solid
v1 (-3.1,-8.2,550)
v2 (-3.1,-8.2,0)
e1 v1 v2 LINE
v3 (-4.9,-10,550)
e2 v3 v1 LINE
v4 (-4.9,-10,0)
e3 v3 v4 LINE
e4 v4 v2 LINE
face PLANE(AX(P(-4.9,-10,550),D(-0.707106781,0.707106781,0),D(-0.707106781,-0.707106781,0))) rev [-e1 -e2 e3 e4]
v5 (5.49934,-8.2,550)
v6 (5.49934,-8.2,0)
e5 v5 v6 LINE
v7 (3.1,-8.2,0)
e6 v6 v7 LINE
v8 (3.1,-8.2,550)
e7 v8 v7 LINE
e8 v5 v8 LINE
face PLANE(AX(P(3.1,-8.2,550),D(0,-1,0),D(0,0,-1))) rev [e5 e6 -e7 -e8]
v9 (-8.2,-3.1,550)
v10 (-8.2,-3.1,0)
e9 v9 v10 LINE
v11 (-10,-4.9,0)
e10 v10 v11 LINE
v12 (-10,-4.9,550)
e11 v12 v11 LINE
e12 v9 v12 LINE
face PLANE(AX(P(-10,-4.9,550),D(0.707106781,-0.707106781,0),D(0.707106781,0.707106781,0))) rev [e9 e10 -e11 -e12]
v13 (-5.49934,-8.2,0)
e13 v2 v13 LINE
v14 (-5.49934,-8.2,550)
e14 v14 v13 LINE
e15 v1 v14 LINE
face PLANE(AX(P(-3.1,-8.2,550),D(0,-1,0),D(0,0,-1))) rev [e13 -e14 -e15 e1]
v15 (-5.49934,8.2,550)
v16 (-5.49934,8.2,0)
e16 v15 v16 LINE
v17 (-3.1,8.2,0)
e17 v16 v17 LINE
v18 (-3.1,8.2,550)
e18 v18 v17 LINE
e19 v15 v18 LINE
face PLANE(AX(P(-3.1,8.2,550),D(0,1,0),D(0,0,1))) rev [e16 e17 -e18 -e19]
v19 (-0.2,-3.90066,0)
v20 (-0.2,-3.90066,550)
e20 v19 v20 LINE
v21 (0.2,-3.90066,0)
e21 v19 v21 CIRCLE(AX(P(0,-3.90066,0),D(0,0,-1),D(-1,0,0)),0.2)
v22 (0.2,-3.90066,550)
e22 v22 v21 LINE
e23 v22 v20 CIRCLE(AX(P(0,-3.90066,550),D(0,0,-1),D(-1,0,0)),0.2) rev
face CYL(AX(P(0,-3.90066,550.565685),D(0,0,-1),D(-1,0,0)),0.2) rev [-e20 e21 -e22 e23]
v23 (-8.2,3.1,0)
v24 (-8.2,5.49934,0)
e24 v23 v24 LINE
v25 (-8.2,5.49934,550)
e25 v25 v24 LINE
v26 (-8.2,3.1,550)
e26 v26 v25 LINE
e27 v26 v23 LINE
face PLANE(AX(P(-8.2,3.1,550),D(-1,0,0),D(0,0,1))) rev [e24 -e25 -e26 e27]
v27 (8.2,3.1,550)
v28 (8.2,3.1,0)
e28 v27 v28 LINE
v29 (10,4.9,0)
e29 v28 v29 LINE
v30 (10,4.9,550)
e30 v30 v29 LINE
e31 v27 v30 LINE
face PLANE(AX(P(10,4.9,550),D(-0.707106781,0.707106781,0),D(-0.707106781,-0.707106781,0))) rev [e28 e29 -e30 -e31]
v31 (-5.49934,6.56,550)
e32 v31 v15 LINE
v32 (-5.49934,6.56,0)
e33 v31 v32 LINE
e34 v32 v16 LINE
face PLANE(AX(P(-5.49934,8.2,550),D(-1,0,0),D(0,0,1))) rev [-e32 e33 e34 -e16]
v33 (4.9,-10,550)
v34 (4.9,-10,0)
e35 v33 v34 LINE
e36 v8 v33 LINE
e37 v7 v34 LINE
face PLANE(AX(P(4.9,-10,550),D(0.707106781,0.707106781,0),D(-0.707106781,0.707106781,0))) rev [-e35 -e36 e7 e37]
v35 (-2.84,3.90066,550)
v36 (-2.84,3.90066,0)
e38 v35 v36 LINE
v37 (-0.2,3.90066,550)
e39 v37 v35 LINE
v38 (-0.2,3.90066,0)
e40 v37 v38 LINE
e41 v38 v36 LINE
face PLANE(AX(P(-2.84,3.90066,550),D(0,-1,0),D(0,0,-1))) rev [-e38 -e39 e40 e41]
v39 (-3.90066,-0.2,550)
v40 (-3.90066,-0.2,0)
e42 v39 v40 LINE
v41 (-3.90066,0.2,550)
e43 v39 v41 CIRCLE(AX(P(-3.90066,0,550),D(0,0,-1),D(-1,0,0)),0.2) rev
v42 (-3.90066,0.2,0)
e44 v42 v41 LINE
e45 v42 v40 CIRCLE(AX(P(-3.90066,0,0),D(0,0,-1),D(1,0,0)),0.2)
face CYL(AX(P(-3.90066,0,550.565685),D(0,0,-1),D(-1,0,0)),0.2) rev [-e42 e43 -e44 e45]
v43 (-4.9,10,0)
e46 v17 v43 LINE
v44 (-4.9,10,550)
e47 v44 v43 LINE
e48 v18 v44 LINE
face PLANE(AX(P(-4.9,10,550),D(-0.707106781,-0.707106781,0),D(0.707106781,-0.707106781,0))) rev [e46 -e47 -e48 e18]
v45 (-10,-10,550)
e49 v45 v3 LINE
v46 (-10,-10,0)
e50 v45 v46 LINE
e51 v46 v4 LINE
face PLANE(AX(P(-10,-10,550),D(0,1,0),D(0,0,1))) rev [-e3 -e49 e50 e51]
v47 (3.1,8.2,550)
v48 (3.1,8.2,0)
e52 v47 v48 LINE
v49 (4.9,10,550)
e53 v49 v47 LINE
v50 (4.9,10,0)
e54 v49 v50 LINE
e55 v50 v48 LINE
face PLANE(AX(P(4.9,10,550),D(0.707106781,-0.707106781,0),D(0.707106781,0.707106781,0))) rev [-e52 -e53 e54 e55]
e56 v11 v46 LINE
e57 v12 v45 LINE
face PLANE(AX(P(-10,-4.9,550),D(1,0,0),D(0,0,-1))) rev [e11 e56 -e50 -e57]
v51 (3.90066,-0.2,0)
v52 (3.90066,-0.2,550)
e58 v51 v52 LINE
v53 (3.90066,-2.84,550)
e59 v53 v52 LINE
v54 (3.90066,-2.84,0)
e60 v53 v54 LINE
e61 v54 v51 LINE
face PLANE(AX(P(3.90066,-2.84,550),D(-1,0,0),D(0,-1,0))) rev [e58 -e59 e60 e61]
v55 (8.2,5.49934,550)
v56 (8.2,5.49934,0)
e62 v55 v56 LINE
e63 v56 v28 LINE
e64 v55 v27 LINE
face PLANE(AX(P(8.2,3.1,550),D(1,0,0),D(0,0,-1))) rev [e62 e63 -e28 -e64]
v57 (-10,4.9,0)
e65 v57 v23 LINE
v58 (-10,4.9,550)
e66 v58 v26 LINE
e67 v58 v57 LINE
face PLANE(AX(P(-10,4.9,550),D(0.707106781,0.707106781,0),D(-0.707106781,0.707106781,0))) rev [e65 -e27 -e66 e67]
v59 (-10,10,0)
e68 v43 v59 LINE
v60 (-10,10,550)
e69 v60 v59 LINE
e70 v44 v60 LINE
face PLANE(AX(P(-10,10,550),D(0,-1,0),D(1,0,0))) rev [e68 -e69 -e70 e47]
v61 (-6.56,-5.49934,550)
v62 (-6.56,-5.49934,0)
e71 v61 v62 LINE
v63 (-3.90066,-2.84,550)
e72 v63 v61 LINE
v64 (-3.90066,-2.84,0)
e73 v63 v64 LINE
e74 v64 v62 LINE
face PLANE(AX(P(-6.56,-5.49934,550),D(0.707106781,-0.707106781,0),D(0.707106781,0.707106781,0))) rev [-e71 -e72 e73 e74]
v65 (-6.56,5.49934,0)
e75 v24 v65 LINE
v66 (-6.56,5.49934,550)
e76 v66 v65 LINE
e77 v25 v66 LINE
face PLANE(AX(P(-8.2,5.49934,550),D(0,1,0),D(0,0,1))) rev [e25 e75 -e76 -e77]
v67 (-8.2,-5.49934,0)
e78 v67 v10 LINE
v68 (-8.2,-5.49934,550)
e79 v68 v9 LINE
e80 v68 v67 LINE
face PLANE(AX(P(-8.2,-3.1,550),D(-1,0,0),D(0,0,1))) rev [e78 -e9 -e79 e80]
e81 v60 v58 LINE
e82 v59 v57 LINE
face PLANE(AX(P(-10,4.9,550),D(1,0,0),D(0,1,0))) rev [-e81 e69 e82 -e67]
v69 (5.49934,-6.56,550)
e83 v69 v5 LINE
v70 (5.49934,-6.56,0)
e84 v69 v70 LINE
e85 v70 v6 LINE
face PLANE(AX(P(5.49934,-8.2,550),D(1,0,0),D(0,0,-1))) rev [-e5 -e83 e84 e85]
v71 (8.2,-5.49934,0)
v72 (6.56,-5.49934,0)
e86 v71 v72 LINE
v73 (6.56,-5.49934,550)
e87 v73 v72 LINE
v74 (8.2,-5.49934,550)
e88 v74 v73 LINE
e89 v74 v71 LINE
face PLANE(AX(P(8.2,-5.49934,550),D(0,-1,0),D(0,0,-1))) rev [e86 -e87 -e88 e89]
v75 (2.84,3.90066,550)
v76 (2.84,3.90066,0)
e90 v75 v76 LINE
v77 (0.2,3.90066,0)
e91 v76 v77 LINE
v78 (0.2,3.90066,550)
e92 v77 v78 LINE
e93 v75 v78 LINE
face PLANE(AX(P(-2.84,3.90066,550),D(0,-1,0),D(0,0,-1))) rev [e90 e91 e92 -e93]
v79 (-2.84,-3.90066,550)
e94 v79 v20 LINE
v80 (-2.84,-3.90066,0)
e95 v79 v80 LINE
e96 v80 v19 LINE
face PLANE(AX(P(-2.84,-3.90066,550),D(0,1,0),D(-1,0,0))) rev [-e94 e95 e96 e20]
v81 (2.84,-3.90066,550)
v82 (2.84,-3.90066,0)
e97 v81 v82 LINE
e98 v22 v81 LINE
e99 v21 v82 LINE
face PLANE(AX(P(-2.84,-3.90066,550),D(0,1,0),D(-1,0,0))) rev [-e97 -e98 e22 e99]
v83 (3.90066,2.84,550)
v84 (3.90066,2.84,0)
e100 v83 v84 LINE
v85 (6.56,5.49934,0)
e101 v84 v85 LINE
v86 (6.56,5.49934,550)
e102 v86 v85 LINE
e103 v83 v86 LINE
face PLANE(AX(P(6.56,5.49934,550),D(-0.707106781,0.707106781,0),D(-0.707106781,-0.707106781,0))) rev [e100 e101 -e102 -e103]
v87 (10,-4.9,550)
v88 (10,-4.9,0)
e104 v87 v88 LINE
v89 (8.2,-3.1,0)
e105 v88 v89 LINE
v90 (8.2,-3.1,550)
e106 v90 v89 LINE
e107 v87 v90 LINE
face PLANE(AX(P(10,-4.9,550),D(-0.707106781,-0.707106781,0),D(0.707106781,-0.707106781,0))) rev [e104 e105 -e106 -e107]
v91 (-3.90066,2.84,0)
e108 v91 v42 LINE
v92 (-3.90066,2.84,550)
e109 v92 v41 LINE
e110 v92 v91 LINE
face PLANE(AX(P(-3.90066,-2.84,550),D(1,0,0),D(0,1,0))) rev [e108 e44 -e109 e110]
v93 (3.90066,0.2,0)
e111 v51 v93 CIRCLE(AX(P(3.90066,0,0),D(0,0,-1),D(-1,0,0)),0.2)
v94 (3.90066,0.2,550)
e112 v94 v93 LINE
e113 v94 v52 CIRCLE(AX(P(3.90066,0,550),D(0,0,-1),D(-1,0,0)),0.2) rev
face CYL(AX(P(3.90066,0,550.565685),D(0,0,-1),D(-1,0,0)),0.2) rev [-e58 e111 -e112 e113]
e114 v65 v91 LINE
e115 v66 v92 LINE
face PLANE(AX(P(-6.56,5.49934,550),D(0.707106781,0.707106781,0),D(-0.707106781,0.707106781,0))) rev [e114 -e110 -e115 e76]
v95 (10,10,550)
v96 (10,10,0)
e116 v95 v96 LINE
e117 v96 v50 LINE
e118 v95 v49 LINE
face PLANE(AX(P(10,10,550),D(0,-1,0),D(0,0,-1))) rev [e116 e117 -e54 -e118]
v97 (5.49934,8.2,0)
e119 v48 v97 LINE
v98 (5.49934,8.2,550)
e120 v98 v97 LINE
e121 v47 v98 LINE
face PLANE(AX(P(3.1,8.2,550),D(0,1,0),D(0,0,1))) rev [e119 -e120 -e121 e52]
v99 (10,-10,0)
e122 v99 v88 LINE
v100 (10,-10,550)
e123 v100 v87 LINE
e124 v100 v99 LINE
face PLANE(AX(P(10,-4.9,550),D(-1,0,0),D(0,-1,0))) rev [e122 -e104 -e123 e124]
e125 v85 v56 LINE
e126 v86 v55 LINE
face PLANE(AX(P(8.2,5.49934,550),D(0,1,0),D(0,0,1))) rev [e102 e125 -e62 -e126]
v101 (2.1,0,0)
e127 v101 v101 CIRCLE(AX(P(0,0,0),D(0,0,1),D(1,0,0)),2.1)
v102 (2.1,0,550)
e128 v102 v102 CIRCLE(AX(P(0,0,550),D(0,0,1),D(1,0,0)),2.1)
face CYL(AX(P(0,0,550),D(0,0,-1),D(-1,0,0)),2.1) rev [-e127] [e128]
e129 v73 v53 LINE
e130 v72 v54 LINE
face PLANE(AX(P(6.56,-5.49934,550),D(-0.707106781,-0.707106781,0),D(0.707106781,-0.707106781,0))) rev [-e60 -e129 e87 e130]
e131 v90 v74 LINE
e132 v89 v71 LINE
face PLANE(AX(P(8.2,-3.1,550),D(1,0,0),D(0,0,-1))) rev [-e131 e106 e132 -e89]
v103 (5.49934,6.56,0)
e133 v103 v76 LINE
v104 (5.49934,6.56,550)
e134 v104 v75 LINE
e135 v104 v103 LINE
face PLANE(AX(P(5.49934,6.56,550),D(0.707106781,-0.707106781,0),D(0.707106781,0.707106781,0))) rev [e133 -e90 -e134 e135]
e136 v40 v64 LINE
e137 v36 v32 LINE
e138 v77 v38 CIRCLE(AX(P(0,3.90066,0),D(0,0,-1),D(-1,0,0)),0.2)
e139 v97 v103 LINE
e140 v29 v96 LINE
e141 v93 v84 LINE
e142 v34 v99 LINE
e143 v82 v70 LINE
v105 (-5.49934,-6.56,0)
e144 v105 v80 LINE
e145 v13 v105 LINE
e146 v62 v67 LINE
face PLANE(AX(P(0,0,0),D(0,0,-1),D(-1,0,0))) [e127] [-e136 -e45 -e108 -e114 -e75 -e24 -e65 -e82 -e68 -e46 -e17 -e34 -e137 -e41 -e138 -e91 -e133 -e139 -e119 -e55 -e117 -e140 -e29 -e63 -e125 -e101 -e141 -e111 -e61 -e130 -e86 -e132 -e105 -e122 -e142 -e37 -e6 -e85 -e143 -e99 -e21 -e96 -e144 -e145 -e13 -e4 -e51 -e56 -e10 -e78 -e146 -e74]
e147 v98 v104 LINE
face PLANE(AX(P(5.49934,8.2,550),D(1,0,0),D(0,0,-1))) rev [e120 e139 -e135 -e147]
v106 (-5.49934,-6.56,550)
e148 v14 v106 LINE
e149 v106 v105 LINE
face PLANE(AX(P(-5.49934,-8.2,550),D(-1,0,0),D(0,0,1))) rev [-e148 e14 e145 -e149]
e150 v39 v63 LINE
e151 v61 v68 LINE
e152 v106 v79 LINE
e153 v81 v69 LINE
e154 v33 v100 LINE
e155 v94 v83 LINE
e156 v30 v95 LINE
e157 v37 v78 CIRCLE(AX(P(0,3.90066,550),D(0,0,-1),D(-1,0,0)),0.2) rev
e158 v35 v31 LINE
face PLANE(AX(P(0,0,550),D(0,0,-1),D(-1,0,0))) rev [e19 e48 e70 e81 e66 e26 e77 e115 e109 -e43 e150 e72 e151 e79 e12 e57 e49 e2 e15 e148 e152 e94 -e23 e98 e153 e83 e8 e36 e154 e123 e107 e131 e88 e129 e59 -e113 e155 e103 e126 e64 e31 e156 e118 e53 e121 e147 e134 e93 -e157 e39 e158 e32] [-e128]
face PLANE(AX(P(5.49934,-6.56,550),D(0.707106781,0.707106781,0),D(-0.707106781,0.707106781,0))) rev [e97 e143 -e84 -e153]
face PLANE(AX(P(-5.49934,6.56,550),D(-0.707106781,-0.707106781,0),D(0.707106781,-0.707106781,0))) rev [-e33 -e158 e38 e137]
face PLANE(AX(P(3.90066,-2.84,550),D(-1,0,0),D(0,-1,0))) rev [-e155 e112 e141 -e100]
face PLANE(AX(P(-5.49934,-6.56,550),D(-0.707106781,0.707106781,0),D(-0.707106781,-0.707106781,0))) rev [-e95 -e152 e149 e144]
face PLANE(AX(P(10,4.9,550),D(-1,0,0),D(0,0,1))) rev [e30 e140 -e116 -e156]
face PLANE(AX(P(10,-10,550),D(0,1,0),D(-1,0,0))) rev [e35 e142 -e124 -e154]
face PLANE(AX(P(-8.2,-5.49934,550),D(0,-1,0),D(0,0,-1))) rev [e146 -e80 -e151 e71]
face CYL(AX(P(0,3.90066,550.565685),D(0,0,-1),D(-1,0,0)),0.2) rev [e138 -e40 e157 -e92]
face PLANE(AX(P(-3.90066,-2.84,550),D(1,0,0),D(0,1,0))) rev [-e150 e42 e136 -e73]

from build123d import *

# Parameters (mm, degrees)
SKETCH1_R           = 2.1
BOSS_EXTRUDE1_DEPTH = 550
CUT_EXTRUDE1_DEPTH  = 550


# Read off the part's stored shape, not the designer's step: Cut-Extrude1
with BuildPart() as part:
    # Sketch1 → Boss-Extrude1 (new body)
    with BuildSketch(Plane.XY):
        Polygon((-10, -4.9), (-10, -10), (-4.9, -10), (-3.1, -8.2), (-5.499339828, -8.2), (-5.499339828, -6.56), (-2.84, -3.900660172), (2.84, -3.900660172), (5.499339828, -6.56), (5.499339828, -8.2), (3.1, -8.2), (4.9, -10), (10, -10), (10, -4.9), (8.2, -3.1), (8.2, -5.499339828), (6.56, -5.499339828), (3.900660172, -2.84), (3.900660172, 2.84), (6.56, 5.499339828), (8.2, 5.499339828), (8.2, 3.1), (10, 4.9), (10, 10), (4.9, 10), (3.1, 8.2), (5.499339828, 8.2), (5.499339828, 6.56), (2.84, 3.900660172), (-2.84, 3.900660172), (-5.499339828, 6.56), (-5.499339828, 8.2), (-3.1, 8.2), (-4.9, 10), (-10, 10), (-10, 4.9), (-8.2, 3.1), (-8.2, 5.499339828), (-6.56, 5.499339828), (-3.900660172, 2.84), (-3.900660172, -2.84), (-6.56, -5.499339828), (-8.2, -5.499339828), (-8.2, -3.1), align=None)
        Circle(SKETCH1_R, mode=Mode.SUBTRACT)
    extrude(amount=BOSS_EXTRUDE1_DEPTH)

    # Cut-Extrude1 outline → Cut-Extrude1 (cut)
    with BuildSketch(Plane.XY):
        with BuildLine():
            ThreePointArc((-3.900660172, -0.2), (-3.700660172, 0), (-3.900660172, 0.2))
            Line((-3.900660172, 0.2), (-3.900660172, -0.2))
        make_face()
        with BuildLine():
            ThreePointArc((-0.2, 3.900660172), (0, 3.700660172), (0.2, 3.900660172))
            Line((0.2, 3.900660172), (-0.2, 3.900660172))
        make_face()
        with BuildLine():
            ThreePointArc((3.900660172, 0.2), (3.700660172, 0), (3.900660172, -0.2))
            Line((3.900660172, -0.2), (3.900660172, 0.2))
        make_face()
        with BuildLine():
            ThreePointArc((0.2, -3.900660172), (0, -3.700660172), (-0.2, -3.900660172))
            Line((-0.2, -3.900660172), (0.2, -3.900660172))
        make_face()
    extrude(amount=CUT_EXTRUDE1_DEPTH, mode=Mode.SUBTRACT)


solid = part.part
